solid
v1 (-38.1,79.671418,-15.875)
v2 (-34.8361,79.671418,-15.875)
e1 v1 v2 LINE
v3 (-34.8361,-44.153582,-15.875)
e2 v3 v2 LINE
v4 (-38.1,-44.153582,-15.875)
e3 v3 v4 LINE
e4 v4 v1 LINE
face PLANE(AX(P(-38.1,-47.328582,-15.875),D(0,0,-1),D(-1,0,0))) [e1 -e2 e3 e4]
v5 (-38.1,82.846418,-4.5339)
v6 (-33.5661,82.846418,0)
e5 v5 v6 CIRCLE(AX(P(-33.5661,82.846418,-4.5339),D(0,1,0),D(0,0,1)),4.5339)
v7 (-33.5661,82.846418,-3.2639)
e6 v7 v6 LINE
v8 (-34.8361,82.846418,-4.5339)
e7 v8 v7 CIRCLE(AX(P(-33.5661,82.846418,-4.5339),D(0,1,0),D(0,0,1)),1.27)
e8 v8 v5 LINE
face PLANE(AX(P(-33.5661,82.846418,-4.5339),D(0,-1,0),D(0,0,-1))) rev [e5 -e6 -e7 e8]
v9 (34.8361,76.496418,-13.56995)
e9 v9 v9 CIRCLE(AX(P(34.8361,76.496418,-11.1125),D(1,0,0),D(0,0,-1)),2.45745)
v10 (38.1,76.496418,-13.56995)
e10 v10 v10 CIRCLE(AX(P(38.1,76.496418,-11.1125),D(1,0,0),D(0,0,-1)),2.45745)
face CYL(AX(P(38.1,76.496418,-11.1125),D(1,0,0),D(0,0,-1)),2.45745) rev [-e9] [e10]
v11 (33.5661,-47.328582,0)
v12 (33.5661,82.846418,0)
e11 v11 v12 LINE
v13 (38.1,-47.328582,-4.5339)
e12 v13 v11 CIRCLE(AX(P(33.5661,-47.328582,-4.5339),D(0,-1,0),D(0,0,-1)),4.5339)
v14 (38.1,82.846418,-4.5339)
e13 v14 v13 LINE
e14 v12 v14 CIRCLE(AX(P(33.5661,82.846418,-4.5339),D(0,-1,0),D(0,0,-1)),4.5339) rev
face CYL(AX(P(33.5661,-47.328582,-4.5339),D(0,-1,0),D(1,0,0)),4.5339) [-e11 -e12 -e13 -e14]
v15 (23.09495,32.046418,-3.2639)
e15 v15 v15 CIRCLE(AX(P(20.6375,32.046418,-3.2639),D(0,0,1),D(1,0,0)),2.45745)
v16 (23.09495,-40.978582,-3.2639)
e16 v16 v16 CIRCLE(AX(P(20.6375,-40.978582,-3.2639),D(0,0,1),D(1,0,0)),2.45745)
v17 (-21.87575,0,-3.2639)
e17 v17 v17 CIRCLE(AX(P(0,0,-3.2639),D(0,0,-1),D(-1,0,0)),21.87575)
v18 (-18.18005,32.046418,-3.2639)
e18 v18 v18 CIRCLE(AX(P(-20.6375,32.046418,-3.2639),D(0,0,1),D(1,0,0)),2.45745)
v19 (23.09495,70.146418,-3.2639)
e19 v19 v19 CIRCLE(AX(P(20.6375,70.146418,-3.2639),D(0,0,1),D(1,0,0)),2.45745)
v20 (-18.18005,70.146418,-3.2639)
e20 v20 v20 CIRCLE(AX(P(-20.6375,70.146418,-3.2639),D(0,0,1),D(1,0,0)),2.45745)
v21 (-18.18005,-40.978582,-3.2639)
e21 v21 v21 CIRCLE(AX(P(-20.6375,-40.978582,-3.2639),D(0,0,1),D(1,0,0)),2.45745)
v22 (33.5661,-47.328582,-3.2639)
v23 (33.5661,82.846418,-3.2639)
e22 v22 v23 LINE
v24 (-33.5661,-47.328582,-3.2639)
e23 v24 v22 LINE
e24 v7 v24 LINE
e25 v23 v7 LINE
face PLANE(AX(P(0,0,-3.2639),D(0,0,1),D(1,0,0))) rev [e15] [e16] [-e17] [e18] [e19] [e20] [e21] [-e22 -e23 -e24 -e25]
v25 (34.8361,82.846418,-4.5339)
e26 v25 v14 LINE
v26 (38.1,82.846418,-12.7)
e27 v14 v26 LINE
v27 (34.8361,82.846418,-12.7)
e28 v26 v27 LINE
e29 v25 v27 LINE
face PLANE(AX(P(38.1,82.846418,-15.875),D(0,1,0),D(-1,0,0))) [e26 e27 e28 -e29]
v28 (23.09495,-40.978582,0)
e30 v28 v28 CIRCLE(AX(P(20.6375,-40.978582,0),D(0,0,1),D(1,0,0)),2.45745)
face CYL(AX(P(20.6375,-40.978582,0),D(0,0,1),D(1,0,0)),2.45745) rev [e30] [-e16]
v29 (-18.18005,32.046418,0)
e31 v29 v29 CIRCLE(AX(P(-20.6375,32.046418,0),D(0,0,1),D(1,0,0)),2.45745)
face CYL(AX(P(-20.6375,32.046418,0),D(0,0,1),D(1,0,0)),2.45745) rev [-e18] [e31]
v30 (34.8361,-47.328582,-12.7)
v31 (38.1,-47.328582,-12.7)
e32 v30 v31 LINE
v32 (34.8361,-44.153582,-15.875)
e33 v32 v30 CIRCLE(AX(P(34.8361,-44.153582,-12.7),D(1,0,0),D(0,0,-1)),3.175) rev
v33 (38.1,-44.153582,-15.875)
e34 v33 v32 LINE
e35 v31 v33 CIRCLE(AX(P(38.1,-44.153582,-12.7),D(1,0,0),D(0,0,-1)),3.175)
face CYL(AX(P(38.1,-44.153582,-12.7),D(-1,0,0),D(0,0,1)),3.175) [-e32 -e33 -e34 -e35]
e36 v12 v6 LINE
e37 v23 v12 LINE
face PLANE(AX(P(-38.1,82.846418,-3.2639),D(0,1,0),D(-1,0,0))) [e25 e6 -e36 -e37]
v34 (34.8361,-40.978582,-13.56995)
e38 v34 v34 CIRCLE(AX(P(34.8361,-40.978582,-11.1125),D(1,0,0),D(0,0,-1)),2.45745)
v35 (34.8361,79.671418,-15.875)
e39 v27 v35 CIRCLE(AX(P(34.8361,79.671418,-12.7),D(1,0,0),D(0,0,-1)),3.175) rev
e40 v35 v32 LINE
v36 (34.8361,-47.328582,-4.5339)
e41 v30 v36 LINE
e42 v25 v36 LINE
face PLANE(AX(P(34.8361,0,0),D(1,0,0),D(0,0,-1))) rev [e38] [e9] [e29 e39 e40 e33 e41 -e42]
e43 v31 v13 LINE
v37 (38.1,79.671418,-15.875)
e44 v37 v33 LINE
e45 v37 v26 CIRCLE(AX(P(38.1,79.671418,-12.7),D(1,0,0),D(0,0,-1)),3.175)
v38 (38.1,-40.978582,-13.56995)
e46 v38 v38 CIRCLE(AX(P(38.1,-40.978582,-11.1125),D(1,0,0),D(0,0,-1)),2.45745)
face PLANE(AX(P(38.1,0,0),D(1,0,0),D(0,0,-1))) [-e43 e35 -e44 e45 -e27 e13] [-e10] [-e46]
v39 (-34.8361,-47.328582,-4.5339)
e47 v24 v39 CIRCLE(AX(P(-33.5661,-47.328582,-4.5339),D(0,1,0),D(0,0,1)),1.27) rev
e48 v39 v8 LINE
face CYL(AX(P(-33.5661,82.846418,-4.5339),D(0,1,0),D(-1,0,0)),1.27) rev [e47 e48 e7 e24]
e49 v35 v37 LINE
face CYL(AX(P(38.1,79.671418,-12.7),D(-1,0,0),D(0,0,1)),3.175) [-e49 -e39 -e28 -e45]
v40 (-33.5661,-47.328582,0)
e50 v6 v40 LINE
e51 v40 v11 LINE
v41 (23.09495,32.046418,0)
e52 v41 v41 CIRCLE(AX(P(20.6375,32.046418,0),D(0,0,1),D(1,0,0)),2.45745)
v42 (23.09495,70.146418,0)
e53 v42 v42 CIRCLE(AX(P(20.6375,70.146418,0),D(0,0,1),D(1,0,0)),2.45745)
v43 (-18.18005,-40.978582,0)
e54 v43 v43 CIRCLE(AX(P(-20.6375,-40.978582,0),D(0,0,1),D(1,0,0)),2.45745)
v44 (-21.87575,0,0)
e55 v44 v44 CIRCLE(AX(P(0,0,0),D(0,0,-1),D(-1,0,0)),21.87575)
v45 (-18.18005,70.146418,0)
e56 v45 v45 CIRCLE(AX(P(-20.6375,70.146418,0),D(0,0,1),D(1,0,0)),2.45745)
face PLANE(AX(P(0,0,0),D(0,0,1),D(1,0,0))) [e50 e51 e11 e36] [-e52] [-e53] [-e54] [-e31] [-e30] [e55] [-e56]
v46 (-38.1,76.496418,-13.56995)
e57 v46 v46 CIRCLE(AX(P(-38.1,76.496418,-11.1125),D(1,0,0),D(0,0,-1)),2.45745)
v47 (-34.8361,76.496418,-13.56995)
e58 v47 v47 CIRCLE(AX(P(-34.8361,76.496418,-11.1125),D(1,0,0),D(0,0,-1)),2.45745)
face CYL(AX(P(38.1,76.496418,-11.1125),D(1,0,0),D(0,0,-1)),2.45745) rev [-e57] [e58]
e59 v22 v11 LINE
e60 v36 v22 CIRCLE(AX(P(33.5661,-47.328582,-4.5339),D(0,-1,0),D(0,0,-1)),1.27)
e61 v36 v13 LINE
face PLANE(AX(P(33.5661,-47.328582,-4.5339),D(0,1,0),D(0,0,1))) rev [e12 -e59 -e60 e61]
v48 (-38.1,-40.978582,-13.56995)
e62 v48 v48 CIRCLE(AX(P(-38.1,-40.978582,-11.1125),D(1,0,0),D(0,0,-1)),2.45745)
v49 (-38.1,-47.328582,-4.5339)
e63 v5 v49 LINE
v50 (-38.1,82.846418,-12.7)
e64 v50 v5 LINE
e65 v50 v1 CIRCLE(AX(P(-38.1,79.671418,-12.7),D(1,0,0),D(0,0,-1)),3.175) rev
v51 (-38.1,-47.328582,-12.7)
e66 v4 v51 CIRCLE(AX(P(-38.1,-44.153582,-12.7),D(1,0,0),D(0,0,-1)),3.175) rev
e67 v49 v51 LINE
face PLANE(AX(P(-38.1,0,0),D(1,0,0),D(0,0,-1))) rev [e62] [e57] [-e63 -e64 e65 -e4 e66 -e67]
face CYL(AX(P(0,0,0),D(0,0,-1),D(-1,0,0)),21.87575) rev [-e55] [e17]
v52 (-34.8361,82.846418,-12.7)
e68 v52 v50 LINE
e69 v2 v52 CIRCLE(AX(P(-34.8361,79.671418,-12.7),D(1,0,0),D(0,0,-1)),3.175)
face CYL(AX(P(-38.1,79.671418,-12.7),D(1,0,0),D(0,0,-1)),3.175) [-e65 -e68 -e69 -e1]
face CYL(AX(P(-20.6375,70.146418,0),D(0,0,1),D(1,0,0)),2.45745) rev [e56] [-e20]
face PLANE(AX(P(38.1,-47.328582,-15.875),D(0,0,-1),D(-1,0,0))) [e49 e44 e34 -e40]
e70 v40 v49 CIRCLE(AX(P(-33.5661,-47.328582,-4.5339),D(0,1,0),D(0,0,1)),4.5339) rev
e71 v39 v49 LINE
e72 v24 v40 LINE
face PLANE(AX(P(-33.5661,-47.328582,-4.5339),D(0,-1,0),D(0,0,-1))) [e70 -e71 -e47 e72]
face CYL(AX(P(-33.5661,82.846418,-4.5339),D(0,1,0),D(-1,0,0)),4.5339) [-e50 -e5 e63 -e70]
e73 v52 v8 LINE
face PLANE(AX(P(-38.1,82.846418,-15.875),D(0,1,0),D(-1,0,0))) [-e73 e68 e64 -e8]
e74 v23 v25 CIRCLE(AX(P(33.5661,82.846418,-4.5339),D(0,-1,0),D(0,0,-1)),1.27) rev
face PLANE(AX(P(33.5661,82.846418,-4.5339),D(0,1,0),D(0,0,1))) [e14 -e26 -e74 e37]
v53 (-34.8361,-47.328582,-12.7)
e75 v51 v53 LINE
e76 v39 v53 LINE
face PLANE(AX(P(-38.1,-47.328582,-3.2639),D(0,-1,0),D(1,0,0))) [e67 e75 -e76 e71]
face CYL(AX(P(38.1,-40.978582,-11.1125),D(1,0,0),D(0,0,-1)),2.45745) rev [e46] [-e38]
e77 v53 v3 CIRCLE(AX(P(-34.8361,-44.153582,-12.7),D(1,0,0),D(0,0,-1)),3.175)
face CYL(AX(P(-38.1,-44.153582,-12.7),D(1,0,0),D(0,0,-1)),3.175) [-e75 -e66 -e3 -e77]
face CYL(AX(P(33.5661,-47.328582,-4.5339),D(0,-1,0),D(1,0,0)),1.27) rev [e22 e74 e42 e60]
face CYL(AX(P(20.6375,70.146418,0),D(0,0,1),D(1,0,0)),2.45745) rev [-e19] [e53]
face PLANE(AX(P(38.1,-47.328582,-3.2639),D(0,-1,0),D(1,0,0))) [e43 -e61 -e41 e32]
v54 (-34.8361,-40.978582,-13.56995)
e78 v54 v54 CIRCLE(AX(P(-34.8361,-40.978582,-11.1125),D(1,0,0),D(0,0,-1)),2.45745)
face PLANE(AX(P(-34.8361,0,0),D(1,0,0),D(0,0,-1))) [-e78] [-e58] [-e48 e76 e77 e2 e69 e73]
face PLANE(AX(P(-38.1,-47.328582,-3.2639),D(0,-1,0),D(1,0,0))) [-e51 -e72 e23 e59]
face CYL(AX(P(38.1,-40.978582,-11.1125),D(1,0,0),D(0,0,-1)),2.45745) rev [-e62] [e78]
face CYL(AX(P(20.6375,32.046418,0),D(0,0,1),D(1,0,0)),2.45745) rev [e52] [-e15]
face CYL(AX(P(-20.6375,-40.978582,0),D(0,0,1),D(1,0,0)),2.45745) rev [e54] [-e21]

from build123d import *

# Parameters (mm, degrees)
SKETCH1_W                      = 76.2
SKETCH1_H                      = 130.175
BASE_FLANGE1_DEPTH             = 3.2639
EDGE_FLANGE1_STRIP_W           = 15.5956
EDGE_FLANGE1_STRIP_H           = 3.2639
EDGE_FLANGE1_STRIP_CUT_DEPTH   = 130.175
EDGE_FLANGE1_STRIP_2_W         = 15.5956
EDGE_FLANGE1_STRIP_2_H         = 3.2639
EDGE_FLANGE1_STRIP_CUT_2_DEPTH = 130.175
EDGE_FLANGE1_DEPTH             = 130.175
EDGE_FLANGE1_BEND_DEPTH        = 130.175
F_10_0_1935_DIAMETER_HOLE1_D   = 4.9149
SKETCH32_R                     = 21.87575
CUT_EXTRUDE1_DEPTH             = 93.055303045
F_10_0_1935_DIAMETER_HOLE2_D   = 4.9149
FILLET1_R                      = 3.175
F_10_0_1935_DIAMETER_HOLE3_D   = 4.9149


# Sheet-metal steps are written as plain solids
with BuildPart() as part:
    # Sketch1 → Base-Flange1 (new body)
    with BuildSketch(Plane.XY):
        with Locations((0, 17.758918)):
            Rectangle(SKETCH1_W, SKETCH1_H)
    extrude(amount=-BASE_FLANGE1_DEPTH)

    # Edge-Flange1 strip (across the edge) → Edge-Flange1 strip cut (cut)
    with BuildSketch(Plane(origin=(38.1, 82.846418, -3.2639), x_dir=(-1, 0, 0), z_dir=(0, -1, 0))):
        with Locations((-3.2639, -1.63195)):
            Rectangle(EDGE_FLANGE1_STRIP_W, EDGE_FLANGE1_STRIP_H)
    extrude(amount=EDGE_FLANGE1_STRIP_CUT_DEPTH, mode=Mode.SUBTRACT)

    # Edge-Flange1 strip 2 (across the edge) → Edge-Flange1 strip cut 2 (cut)
    with BuildSketch(Plane(origin=(-38.1, -47.328582, -3.2639), x_dir=(1, 0, 0), z_dir=(0, 1, 0))):
        with Locations((-3.2639, -1.63195)):
            Rectangle(EDGE_FLANGE1_STRIP_2_W, EDGE_FLANGE1_STRIP_2_H)
    extrude(amount=EDGE_FLANGE1_STRIP_CUT_2_DEPTH, mode=Mode.SUBTRACT)

    # Edge-Flange1 section (across the edge) → Edge-Flange1 (add)
    with BuildSketch(Plane(origin=(38.1, 82.846418, -3.2639), x_dir=(-1, 0, 0), z_dir=(0, -1, 0))):
        with BuildLine():
            Line((0, 1.27), (0, 12.6111))
            Line((0, 12.6111), (3.2639, 12.6111))
            Line((3.2639, 12.6111), (3.2639, 1.27))
            ThreePointArc((3.2639, 1.27), (3.635874388, 0.371974388), (4.5339, 0))
            Line((4.5339, 0), (4.5339, -3.2639))
            ThreePointArc((4.5339, -3.2639), (1.327948565, -1.935951435), (0, 1.27))
        make_face()
    extrude(amount=EDGE_FLANGE1_DEPTH)

    # Edge-Flange1 section 2 (across the edge) → Edge-Flange1 bend (add)
    with BuildSketch(Plane(origin=(-38.1, -47.328582, -3.2639), x_dir=(1, 0, 0), z_dir=(0, 1, 0))):
        with BuildLine():
            Line((0, 1.27), (0, 12.6111))
            Line((0, 12.6111), (3.2639, 12.6111))
            Line((3.2639, 12.6111), (3.2639, 1.27))
            ThreePointArc((3.2639, 1.27), (3.635874388, 0.371974388), (4.5339, 0))
            Line((4.5339, 0), (4.5339, -3.2639))
            ThreePointArc((4.5339, -3.2639), (1.327948565, -1.935951435), (0, 1.27))
        make_face()
    extrude(amount=EDGE_FLANGE1_BEND_DEPTH)

    # #10 (0.1935) Diameter Hole1 (through all)
    with Locations(Plane(origin=(38.1, 0, 0), x_dir=(0, 0, -1), z_dir=(1, 0, 0))):
        with Locations((11.1125, 76.496418), (11.1125, -40.978582)):
            Hole(F_10_0_1935_DIAMETER_HOLE1_D / 2)

    # Sketch32 → Cut-Extrude1 (cut, through all)
    with BuildSketch(Plane(origin=(0, 0, -3.2639), x_dir=(-1, 0, 0), z_dir=(0, 0, -1))):
        Circle(SKETCH32_R)
    extrude(amount=-CUT_EXTRUDE1_DEPTH, mode=Mode.SUBTRACT)

    # #10 (0.1935) Diameter Hole2 (through all)
    with Locations(Plane.XY):
        with Locations((-20.6375, -40.978582), (20.6375, -40.978582)):
            Hole(F_10_0_1935_DIAMETER_HOLE2_D / 2)

    # Fillet1
    fillet1_edges = [part.edges().sort_by_distance(p)[0] for p in [
        (36.46805, 82.846418, -15.875),
        (36.46805, -47.328582, -15.875),
        (-36.46805, -47.328582, -15.875),
        (-36.46805, 82.846418, -15.875),
    ]]
    fillet(fillet1_edges, radius=FILLET1_R)

    # #10 (0.1935) Diameter Hole3 (through all)
    with Locations(Plane.XY):
        with Locations((-20.6375, 70.146418), (20.6375, 70.146418), (20.6375, 32.046418), (-20.6375, 32.046418)):
            Hole(F_10_0_1935_DIAMETER_HOLE3_D / 2)


solid = part.part
